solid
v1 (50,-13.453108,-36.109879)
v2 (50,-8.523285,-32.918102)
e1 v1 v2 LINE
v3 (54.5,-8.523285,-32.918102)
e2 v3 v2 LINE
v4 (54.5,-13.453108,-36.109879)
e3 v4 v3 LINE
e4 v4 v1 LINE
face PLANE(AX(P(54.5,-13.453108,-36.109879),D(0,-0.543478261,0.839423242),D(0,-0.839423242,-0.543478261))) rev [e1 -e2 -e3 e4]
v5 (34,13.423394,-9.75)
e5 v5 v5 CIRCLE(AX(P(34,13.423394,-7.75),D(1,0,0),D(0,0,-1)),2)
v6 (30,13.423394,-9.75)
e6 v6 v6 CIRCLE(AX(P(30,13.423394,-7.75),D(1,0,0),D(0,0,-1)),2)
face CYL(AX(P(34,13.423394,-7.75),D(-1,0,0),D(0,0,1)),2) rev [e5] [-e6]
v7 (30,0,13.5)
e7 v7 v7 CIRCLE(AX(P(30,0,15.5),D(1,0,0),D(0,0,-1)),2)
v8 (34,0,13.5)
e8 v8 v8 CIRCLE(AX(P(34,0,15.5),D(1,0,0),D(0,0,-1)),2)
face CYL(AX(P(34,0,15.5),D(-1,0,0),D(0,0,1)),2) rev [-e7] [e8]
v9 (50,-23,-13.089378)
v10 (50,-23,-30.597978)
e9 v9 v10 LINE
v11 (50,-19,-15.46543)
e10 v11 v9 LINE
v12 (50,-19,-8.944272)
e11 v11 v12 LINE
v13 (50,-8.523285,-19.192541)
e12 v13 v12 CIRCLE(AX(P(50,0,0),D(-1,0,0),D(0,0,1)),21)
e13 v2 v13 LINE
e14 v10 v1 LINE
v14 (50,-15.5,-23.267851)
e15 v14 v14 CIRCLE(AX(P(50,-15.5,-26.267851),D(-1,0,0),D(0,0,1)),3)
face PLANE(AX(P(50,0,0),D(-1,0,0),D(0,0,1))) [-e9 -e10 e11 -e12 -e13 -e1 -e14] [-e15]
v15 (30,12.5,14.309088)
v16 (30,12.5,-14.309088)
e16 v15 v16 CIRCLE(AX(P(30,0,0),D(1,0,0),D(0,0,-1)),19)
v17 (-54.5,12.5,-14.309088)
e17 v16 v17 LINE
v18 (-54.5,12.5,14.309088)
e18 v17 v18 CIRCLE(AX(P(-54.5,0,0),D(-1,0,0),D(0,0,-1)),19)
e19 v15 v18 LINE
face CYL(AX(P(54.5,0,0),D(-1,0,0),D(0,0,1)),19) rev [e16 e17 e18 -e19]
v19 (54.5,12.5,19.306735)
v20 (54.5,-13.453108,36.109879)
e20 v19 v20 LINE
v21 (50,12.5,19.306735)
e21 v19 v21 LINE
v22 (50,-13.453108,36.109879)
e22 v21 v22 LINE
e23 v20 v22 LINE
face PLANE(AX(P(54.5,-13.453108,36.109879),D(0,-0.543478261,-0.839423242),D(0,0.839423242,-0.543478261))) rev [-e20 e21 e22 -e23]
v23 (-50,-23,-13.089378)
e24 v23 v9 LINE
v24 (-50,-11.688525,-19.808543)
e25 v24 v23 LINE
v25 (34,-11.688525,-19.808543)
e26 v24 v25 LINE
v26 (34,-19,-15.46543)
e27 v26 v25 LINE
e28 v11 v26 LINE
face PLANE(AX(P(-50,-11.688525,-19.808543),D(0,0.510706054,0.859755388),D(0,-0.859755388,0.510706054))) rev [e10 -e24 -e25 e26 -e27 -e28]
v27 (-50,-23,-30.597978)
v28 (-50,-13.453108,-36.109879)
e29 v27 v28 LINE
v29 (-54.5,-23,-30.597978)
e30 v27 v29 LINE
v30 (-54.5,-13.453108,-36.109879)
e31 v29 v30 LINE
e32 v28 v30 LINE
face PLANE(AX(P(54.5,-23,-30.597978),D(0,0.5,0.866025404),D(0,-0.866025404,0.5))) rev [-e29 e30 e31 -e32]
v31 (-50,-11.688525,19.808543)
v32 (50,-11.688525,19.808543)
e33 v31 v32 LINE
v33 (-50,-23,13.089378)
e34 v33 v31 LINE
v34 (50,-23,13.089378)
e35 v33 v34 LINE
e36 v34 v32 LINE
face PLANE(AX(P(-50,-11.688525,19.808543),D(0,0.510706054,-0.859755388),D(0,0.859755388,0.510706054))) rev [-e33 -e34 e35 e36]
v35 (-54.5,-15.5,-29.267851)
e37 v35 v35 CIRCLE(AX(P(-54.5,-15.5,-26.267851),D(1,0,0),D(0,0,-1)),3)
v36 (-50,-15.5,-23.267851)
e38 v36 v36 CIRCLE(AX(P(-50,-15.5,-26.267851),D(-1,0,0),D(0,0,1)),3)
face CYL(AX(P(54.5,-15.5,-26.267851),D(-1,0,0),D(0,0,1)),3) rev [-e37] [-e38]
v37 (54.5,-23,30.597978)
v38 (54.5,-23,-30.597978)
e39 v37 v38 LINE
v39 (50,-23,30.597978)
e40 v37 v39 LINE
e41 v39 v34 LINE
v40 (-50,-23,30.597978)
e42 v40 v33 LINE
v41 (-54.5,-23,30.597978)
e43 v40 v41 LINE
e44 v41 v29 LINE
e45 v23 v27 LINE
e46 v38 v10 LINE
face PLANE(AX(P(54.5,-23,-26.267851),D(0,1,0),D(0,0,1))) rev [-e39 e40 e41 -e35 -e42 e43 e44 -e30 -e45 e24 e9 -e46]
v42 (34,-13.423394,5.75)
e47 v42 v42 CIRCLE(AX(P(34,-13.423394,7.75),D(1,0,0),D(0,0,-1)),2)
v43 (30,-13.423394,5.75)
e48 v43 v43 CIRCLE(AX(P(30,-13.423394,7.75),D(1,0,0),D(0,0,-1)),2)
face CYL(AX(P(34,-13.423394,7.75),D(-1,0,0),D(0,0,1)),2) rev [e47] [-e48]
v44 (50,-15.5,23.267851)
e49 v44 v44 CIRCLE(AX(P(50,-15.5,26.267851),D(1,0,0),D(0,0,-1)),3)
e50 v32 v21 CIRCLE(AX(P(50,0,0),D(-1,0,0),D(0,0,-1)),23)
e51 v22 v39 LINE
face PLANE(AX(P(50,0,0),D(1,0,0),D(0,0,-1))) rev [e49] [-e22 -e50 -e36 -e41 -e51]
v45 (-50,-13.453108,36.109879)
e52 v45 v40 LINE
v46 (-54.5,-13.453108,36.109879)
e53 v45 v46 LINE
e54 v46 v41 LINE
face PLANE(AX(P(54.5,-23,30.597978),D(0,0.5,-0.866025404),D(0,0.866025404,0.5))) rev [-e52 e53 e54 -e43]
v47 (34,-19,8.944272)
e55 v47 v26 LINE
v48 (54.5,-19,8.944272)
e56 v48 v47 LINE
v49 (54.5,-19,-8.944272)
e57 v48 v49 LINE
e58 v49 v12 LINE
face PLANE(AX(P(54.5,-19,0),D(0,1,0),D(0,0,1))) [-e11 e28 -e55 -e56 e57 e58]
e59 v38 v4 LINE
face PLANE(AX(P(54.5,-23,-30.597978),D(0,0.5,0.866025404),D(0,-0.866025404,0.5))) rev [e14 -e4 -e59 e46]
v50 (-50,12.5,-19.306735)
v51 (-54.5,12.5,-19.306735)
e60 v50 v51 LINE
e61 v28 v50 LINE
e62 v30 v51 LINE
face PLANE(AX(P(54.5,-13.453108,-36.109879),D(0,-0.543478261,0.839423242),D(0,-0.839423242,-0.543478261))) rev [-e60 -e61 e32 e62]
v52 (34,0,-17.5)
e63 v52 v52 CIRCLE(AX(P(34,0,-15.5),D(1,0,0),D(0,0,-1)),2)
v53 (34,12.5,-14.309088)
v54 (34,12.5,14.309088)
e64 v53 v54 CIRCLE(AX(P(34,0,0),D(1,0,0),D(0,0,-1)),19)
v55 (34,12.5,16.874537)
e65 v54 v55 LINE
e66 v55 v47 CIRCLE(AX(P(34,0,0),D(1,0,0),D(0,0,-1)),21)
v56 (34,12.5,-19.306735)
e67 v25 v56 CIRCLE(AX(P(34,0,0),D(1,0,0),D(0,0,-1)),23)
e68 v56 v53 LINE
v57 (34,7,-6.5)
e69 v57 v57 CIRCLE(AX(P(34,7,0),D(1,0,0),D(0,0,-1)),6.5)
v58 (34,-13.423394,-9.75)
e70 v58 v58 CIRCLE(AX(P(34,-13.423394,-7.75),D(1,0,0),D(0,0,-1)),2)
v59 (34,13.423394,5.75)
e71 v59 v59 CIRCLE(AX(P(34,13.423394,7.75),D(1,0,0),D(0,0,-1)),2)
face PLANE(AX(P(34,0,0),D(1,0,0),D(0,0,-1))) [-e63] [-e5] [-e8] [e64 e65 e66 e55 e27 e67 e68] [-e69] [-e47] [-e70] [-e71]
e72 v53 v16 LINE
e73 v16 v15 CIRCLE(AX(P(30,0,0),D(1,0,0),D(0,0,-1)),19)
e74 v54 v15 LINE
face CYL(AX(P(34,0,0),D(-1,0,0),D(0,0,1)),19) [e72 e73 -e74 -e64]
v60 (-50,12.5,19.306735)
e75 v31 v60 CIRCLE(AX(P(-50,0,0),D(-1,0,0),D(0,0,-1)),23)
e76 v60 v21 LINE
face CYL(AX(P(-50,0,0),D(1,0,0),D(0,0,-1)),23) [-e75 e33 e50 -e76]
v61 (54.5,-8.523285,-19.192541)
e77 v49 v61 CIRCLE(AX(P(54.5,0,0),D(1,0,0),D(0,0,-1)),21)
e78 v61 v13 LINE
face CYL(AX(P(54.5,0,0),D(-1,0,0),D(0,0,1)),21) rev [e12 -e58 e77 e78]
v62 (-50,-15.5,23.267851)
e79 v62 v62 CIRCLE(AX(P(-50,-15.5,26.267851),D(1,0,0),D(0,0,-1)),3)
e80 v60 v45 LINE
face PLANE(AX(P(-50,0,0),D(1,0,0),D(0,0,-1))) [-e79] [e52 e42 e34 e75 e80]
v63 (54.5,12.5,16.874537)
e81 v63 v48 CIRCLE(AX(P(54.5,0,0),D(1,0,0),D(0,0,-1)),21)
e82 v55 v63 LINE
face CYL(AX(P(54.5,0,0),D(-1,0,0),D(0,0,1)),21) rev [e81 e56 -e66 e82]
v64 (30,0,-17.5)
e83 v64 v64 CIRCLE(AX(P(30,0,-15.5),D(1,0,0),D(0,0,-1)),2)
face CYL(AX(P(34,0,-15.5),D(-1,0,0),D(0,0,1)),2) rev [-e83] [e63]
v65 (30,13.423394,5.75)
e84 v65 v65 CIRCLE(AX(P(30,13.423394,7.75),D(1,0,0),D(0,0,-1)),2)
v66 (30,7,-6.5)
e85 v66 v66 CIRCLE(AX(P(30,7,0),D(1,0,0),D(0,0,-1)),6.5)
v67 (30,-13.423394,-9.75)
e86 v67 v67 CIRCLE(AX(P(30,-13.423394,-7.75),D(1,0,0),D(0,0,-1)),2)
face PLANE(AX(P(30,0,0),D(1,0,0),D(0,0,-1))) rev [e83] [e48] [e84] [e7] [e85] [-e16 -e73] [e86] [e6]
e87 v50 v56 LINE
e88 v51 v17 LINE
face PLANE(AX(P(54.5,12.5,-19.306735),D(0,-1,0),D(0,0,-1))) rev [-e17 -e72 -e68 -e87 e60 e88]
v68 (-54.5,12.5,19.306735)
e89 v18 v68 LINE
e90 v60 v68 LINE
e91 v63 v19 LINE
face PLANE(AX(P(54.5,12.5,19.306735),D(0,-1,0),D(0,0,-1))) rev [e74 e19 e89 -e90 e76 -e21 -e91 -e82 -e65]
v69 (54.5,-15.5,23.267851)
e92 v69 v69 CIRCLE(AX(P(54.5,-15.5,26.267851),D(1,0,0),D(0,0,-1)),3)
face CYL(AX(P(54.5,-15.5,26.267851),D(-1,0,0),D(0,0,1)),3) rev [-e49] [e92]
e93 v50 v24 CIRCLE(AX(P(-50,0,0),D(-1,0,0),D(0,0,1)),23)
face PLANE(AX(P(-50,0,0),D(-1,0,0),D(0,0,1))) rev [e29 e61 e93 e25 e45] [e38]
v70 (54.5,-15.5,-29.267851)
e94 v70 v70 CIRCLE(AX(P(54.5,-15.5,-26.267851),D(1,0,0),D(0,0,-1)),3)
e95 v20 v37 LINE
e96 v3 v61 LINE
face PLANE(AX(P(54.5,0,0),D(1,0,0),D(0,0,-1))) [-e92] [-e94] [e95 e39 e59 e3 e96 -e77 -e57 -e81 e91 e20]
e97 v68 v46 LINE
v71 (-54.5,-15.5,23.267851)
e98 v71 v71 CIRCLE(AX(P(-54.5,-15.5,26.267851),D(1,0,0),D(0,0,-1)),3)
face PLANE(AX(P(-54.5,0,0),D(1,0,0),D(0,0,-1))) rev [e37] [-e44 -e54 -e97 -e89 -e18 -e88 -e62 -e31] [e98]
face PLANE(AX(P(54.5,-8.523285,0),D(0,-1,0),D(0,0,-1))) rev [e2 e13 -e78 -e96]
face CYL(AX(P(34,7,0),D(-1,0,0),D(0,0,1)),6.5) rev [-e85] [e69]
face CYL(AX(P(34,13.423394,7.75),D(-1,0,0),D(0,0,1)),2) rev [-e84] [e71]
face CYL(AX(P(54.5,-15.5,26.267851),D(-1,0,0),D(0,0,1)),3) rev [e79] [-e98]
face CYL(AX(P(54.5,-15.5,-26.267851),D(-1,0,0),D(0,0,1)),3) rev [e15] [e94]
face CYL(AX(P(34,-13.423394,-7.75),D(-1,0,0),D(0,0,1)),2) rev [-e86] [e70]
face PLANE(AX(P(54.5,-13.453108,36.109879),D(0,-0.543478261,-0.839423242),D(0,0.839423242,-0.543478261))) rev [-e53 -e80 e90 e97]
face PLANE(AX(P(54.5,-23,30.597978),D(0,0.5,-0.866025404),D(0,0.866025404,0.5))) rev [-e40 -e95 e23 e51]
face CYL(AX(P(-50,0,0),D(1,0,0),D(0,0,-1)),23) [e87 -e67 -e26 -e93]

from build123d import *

# Parameters (mm, degrees)
SKETCH1_R           = 3
BOSS_EXTRUDE1_DEPTH = 54.5
CUT_EXTRUDE1_DEPTH  = 50
BOSS_EXTRUDE2_START = 34
SKETCH3_R           = 19
SKETCH3_R_2         = 6.5
SKETCH3_R_3         = 2
BOSS_EXTRUDE2_DEPTH = 4
CUT_EXTRUDE2_DEPTH  = 20.5
SKETCH5_W           = 31.652494028
SKETCH5_H           = 22.199486155
CUT_EXTRUDE3_DEPTH  = 16


# Read off the part's stored shape, not the designer's step: Cut-Extrude2
with BuildPart() as part:
    # Sketch1 → Boss-Extrude1 (new, symmetric)
    with BuildSketch(Plane(origin=(0, 0, 0), x_dir=(0, 0, -1), z_dir=(1, 0, 0))):
        with BuildLine():
            Line((26.267851073, -23), (0, -23))
            Line((0, -23), (-26.267851073, -23))
            Line((-26.267851073, -23), (-30.597978092, -23))
            Line((-30.597978092, -23), (-36.109878886, -13.453107779))
            Line((-36.109878886, -13.453107779), (-19.306734576, 12.5))
            Line((-19.306734576, 12.5), (-14.309088021, 12.5))
            ThreePointArc((-14.309088021, 12.5), (0, -19), (14.309088021, 12.5))
            Line((14.309088021, 12.5), (19.306734576, 12.5))
            Line((19.306734576, 12.5), (36.109878886, -13.453107779))
            Line((36.109878886, -13.453107779), (30.597978092, -23))
            Line((30.597978092, -23), (26.267851073, -23))
        make_face()
        with Locations((26.267851073, -15.5)):
            Circle(SKETCH1_R, mode=Mode.SUBTRACT)
        with Locations((-26.267851073, -15.5)):
            Circle(SKETCH1_R, mode=Mode.SUBTRACT)
    extrude(amount=BOSS_EXTRUDE1_DEPTH, both=True)

    # Sketch2 → Cut-Extrude1 (cut, symmetric)
    with BuildSketch(Plane(origin=(0, 0, 0), x_dir=(0, 0, -1), z_dir=(1, 0, 0))):
        with BuildLine():
            Line((19.808543432, -11.68852459), (13.089377665, -23))
            Line((13.089377665, -23), (30.597978092, -23))
            Line((30.597978092, -23), (36.109878886, -13.453107779))
            Line((36.109878886, -13.453107779), (19.306734576, 12.5))
            ThreePointArc((19.306734576, 12.5), (22.995052161, 0.477049386), (19.808543432, -11.68852459))
        make_face()
        with BuildLine():
            Line((-19.808543432, -11.68852459), (-13.089377665, -23))
            Line((-13.089377665, -23), (-30.597978092, -23))
            Line((-30.597978092, -23), (-36.109878886, -13.453107779))
            Line((-36.109878886, -13.453107779), (-19.306734576, 12.5))
            ThreePointArc((-19.306734576, 12.5), (-22.995052161, 0.477049386), (-19.808543432, -11.68852459))
        make_face()
    extrude(amount=CUT_EXTRUDE1_DEPTH, both=True, mode=Mode.SUBTRACT)

    # Sketch3 → Boss-Extrude2 (add)
    with BuildSketch(Plane(origin=(0, 0, 0), x_dir=(0, 0, -1), z_dir=(1, 0, 0)).offset(BOSS_EXTRUDE2_START)):
        Circle(SKETCH3_R)
        with Locations((0, 7)):
            Circle(SKETCH3_R_2, mode=Mode.SUBTRACT)
        with Locations((15.5, 0)):
            Circle(SKETCH3_R_3, mode=Mode.SUBTRACT)
        with Locations((7.75, -13.423393759)):
            Circle(SKETCH3_R_3, mode=Mode.SUBTRACT)
        with Locations((-7.75, -13.423393759)):
            Circle(SKETCH3_R_3, mode=Mode.SUBTRACT)
        with Locations((-15.5, 0)):
            Circle(SKETCH3_R_3, mode=Mode.SUBTRACT)
        with Locations((-7.75, 13.423393759)):
            Circle(SKETCH3_R_3, mode=Mode.SUBTRACT)
        with Locations((7.75, 13.423393759)):
            Circle(SKETCH3_R_3, mode=Mode.SUBTRACT)
    extrude(amount=-BOSS_EXTRUDE2_DEPTH)

    # Cut-Extrude2 outline → Cut-Extrude2 (cut)
    with BuildSketch(Plane(origin=(34, 0, 0), x_dir=(0, 0, -1), z_dir=(1, 0, 0))):
        with BuildLine():
            ThreePointArc((14.309088021, 12.5), (17.298843892, -7.858116823), (0, -19))
            Line((0, -19), (8.94427191, -19))
            ThreePointArc((8.94427191, -19), (15.012010115, -14.684670657), (19.192540727, -8.523284605))
            Line((19.192540727, -8.523284605), (32.918101974, -8.523284605))
            Line((32.918101974, -8.523284605), (19.306734576, 12.5))
            Line((19.306734576, 12.5), (14.309088021, 12.5))
        make_face()
        with BuildLine():
            ThreePointArc((-16.874537031, 12.5), (-20.364558031, -5.126868071), (-8.94427191, -19))
            Line((-8.94427191, -19), (0, -19))
            ThreePointArc((0, -19), (-17.298843892, -7.858116823), (-14.309088021, 12.5))
            Line((-14.309088021, 12.5), (-16.874537031, 12.5))
        make_face()
    extrude(amount=CUT_EXTRUDE2_DEPTH, mode=Mode.SUBTRACT)

    # Sketch5 → Cut-Extrude3 (cut)
    with BuildSketch(Plane(origin=(34, 0, 0), x_dir=(0, 0, -1), z_dir=(1, 0, 0))):
        with Locations((24.770518924, -7.900256922)):
            Rectangle(SKETCH5_W, SKETCH5_H)
    extrude(amount=CUT_EXTRUDE3_DEPTH, mode=Mode.SUBTRACT)


solid = part.part
